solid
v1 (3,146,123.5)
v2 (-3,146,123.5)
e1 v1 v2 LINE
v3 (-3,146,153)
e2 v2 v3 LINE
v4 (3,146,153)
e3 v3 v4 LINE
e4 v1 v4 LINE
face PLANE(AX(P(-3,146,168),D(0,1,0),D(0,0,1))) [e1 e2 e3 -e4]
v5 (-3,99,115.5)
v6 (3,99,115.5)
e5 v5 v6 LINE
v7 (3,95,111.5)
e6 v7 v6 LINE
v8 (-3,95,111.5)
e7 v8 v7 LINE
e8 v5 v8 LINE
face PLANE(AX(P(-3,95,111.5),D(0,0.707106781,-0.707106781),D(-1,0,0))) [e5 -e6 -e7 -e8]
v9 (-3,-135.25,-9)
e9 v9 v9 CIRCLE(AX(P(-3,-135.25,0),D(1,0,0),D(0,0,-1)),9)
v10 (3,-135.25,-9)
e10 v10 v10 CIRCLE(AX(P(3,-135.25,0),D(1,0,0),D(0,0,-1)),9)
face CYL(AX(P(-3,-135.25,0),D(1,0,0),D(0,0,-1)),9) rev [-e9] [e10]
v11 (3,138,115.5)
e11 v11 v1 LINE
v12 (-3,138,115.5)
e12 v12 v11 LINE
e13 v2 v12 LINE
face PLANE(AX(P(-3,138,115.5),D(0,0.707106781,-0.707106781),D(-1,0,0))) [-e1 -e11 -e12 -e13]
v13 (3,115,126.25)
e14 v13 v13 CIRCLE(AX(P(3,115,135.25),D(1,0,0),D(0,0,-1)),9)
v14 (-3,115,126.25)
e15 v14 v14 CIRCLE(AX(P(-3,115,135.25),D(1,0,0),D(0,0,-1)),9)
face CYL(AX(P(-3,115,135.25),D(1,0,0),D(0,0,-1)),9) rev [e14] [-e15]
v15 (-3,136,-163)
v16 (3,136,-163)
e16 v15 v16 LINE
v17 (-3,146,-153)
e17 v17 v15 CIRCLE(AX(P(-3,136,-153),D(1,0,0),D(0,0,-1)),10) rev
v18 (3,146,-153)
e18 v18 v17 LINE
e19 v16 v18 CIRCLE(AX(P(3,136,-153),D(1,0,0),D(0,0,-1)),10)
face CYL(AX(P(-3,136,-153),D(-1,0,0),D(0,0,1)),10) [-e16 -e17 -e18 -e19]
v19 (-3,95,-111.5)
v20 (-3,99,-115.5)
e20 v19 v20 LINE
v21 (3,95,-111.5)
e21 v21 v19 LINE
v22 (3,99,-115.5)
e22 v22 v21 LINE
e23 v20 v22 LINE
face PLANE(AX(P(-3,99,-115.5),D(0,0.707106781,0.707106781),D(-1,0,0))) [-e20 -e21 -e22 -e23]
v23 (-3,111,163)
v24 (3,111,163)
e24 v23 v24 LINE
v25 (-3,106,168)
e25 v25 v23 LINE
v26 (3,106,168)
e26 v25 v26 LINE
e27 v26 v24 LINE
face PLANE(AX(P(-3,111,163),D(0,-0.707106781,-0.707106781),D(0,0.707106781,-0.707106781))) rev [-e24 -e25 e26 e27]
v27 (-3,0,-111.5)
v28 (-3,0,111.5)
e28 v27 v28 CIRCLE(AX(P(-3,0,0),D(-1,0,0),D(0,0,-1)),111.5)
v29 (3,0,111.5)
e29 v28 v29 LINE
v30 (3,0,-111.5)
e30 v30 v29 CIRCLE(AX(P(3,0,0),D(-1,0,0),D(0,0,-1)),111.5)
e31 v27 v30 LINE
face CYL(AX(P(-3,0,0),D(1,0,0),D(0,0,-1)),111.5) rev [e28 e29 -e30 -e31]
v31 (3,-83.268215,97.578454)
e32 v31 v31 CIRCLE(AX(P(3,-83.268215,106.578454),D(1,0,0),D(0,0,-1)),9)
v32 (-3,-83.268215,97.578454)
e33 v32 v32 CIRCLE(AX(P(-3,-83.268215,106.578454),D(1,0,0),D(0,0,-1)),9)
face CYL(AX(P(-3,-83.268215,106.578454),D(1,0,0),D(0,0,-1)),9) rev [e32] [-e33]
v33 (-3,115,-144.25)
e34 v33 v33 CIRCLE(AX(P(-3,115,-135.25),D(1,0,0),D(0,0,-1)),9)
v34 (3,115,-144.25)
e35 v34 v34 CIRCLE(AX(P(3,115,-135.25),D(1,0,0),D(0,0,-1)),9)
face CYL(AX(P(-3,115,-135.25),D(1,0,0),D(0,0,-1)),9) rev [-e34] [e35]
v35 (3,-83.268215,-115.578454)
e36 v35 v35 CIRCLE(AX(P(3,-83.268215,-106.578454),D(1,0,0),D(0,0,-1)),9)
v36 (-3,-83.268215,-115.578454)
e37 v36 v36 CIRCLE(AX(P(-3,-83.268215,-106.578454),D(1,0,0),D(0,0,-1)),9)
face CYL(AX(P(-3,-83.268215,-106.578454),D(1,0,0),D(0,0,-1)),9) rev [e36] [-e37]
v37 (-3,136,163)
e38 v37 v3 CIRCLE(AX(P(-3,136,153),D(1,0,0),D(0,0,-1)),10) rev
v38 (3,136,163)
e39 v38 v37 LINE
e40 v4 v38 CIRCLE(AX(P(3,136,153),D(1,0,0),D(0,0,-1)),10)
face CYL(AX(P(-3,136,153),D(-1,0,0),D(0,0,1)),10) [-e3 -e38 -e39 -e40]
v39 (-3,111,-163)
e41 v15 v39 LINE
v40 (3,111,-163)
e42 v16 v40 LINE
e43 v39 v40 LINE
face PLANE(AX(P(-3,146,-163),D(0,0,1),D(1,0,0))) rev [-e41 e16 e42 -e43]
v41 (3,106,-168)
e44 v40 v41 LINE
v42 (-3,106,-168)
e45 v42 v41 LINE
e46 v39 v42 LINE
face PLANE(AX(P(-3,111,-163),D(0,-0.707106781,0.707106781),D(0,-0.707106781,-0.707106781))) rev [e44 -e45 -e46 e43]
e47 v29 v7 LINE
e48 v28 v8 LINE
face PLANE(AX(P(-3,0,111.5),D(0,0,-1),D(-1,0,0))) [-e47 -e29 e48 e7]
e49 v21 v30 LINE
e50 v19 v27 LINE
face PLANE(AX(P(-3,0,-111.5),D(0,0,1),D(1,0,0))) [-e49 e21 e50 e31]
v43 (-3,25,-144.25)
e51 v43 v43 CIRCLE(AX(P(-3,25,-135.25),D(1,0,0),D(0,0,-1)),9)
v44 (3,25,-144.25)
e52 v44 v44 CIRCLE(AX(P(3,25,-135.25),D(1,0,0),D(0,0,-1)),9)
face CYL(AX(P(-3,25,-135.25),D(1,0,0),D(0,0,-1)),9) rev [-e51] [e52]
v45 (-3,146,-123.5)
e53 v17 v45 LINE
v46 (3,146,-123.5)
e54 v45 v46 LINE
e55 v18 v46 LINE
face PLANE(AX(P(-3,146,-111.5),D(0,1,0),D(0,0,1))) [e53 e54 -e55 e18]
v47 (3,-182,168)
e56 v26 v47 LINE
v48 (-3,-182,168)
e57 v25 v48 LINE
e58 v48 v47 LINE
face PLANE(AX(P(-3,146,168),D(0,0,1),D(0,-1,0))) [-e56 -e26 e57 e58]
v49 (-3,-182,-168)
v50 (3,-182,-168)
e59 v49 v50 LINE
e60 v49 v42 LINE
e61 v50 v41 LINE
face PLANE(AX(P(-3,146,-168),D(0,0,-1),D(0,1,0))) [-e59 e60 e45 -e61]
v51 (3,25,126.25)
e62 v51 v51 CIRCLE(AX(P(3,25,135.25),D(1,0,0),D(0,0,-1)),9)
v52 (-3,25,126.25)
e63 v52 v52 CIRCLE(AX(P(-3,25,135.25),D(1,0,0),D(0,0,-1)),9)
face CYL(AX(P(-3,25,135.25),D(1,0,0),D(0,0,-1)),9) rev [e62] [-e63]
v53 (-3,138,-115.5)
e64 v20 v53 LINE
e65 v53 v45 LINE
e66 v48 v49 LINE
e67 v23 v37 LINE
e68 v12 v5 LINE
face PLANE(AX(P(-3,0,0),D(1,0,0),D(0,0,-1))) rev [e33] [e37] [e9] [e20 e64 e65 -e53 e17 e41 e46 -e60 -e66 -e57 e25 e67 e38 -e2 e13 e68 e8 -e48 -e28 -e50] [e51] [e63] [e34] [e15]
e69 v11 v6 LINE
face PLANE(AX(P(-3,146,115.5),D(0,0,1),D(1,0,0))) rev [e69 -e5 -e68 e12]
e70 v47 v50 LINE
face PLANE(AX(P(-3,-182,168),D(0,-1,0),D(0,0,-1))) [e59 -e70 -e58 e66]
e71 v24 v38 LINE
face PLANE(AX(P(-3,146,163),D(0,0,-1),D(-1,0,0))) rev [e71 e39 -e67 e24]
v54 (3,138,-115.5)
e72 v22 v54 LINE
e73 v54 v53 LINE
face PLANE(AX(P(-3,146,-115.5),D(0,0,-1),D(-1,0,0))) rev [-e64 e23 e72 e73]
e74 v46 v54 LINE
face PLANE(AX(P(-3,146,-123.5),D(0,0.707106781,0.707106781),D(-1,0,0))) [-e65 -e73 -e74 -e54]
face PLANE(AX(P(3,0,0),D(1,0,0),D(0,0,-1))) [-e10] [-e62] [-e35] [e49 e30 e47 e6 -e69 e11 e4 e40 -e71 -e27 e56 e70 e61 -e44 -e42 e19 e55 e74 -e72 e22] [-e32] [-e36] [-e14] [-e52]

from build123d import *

# Parameters (mm, degrees)
SM_START                 = -3
SM_BASE_FLANGE_1_DEPTH   = 6
SKETCH_6_R               = 9
SKETCH_6_R_2             = 68.5
CUT_EXTRUDE_1_DEPTH      = 248.757946391
CUT_EXTRUDE_2_DEPTH      = 248.703451732
CUT_EXTRUDE_2_DEPTH_BACK = 248.703451732
FILLET_1_R               = 10
CUT_EXTRUDE_3_DEPTH      = 248.703451732
CUT_EXTRUDE_3_DEPTH_BACK = 248.703451732
SKETCH_9_W               = 4
SKETCH_9_H               = 47
CHAMFER_1_SIZE           = 8
CHAMFER_2_SIZE           = 4


# Read off the part's stored shape, not the designer's step: Базовая кромка1
with BuildPart() as part:
    # Базовая кромка1 outline → Базовая кромка1 (new body)
    with BuildSketch(Plane(origin=(0, 0, 0), x_dir=(0, 0, -1), z_dir=(1, 0, 0)).offset(SM_START)):
        with BuildLine():
            Line((-111.5, 0), (-111.5, 146))
            Line((-111.5, 146), (-168, 146))
            Line((-168, 146), (-168, -182))
            Line((-168, -182), (168, -182))
            Line((168, -182), (168, 146))
            Line((168, 146), (111.5, 146))
            Line((111.5, 146), (111.5, 0))
            ThreePointArc((111.5, 0), (0, -111.5), (-111.5, 0))
        make_face()
    extrude(amount=SM_BASE_FLANGE_1_DEPTH)

    # Эскиз6 → Вырез-Вытянуть1 (cut, through all)
    with BuildSketch(Plane(origin=(3, 0, 0), x_dir=(0, 0, -1), z_dir=(1, 0, 0))):
        with Locations((-135.25, 115)):
            Circle(SKETCH_6_R)
        with Locations((-106.578454425, -83.268214538)):
            Circle(SKETCH_6_R)
        with Locations((0, -135.25)):
            Circle(SKETCH_6_R)
        with Locations((106.578454425, -83.268214538)):
            Circle(SKETCH_6_R)
        with Locations((135.25, 115)):
            Circle(SKETCH_6_R)
        Circle(SKETCH_6_R_2)
        with Locations((-135.25, 25)):
            Circle(SKETCH_6_R)
        with Locations((135.25, 25)):
            Circle(SKETCH_6_R)
    extrude(amount=-CUT_EXTRUDE_1_DEPTH, mode=Mode.SUBTRACT)

    # Эскиз8 → Вырез-Вытянуть2 (cut, two sides: drawn at the far end of the back side and taken through both)
    with BuildSketch(Plane(origin=(0, 0, 0), x_dir=(0, 0, -1), z_dir=(1, 0, 0)).offset(-CUT_EXTRUDE_2_DEPTH_BACK)):
        Polygon((-163, 111), (-168, 106), (-168, 111), (-168, 146), (-163, 146), align=None)
        Polygon((168, 146), (163, 146), (163, 111), (168, 106), (168, 111), align=None)
    extrude(amount=CUT_EXTRUDE_2_DEPTH + CUT_EXTRUDE_2_DEPTH_BACK, mode=Mode.SUBTRACT)

    # Скругление1
    fillet_1_edges = [part.edges().sort_by_distance(p)[0] for p in [
        (0, 146, 163),
        (0, 146, -163),
    ]]
    fillet(fillet_1_edges, radius=FILLET_1_R)

    # Эскиз9 → Вырез-Вытянуть3 (cut, two sides: drawn at the far end of the back side and taken through both)
    with BuildSketch(Plane(origin=(0, 0, 0), x_dir=(0, 0, -1), z_dir=(1, 0, 0)).offset(-CUT_EXTRUDE_3_DEPTH_BACK)):
        with Locations((-113.5, 122.5)):
            Rectangle(SKETCH_9_W, SKETCH_9_H)
        with Locations((113.5, 122.5)):
            Rectangle(SKETCH_9_W, SKETCH_9_H)
    extrude(amount=CUT_EXTRUDE_3_DEPTH + CUT_EXTRUDE_3_DEPTH_BACK, mode=Mode.SUBTRACT)

    # Фаска1
    chamfer_1_edges = [part.edges().sort_by_distance(p)[0] for p in [
        (0, 146, 115.5),
        (0, 146, -115.5),
    ]]
    chamfer(chamfer_1_edges, length=CHAMFER_1_SIZE)

    # Фаска2
    chamfer_2_edges = [part.edges().sort_by_distance(p)[0] for p in [
        (0, 99, -111.5),
        (0, 99, 111.5),
    ]]
    chamfer(chamfer_2_edges, length=CHAMFER_2_SIZE - 0.0001)  # a hair under: the kernel refuses the full size


solid = part.part
